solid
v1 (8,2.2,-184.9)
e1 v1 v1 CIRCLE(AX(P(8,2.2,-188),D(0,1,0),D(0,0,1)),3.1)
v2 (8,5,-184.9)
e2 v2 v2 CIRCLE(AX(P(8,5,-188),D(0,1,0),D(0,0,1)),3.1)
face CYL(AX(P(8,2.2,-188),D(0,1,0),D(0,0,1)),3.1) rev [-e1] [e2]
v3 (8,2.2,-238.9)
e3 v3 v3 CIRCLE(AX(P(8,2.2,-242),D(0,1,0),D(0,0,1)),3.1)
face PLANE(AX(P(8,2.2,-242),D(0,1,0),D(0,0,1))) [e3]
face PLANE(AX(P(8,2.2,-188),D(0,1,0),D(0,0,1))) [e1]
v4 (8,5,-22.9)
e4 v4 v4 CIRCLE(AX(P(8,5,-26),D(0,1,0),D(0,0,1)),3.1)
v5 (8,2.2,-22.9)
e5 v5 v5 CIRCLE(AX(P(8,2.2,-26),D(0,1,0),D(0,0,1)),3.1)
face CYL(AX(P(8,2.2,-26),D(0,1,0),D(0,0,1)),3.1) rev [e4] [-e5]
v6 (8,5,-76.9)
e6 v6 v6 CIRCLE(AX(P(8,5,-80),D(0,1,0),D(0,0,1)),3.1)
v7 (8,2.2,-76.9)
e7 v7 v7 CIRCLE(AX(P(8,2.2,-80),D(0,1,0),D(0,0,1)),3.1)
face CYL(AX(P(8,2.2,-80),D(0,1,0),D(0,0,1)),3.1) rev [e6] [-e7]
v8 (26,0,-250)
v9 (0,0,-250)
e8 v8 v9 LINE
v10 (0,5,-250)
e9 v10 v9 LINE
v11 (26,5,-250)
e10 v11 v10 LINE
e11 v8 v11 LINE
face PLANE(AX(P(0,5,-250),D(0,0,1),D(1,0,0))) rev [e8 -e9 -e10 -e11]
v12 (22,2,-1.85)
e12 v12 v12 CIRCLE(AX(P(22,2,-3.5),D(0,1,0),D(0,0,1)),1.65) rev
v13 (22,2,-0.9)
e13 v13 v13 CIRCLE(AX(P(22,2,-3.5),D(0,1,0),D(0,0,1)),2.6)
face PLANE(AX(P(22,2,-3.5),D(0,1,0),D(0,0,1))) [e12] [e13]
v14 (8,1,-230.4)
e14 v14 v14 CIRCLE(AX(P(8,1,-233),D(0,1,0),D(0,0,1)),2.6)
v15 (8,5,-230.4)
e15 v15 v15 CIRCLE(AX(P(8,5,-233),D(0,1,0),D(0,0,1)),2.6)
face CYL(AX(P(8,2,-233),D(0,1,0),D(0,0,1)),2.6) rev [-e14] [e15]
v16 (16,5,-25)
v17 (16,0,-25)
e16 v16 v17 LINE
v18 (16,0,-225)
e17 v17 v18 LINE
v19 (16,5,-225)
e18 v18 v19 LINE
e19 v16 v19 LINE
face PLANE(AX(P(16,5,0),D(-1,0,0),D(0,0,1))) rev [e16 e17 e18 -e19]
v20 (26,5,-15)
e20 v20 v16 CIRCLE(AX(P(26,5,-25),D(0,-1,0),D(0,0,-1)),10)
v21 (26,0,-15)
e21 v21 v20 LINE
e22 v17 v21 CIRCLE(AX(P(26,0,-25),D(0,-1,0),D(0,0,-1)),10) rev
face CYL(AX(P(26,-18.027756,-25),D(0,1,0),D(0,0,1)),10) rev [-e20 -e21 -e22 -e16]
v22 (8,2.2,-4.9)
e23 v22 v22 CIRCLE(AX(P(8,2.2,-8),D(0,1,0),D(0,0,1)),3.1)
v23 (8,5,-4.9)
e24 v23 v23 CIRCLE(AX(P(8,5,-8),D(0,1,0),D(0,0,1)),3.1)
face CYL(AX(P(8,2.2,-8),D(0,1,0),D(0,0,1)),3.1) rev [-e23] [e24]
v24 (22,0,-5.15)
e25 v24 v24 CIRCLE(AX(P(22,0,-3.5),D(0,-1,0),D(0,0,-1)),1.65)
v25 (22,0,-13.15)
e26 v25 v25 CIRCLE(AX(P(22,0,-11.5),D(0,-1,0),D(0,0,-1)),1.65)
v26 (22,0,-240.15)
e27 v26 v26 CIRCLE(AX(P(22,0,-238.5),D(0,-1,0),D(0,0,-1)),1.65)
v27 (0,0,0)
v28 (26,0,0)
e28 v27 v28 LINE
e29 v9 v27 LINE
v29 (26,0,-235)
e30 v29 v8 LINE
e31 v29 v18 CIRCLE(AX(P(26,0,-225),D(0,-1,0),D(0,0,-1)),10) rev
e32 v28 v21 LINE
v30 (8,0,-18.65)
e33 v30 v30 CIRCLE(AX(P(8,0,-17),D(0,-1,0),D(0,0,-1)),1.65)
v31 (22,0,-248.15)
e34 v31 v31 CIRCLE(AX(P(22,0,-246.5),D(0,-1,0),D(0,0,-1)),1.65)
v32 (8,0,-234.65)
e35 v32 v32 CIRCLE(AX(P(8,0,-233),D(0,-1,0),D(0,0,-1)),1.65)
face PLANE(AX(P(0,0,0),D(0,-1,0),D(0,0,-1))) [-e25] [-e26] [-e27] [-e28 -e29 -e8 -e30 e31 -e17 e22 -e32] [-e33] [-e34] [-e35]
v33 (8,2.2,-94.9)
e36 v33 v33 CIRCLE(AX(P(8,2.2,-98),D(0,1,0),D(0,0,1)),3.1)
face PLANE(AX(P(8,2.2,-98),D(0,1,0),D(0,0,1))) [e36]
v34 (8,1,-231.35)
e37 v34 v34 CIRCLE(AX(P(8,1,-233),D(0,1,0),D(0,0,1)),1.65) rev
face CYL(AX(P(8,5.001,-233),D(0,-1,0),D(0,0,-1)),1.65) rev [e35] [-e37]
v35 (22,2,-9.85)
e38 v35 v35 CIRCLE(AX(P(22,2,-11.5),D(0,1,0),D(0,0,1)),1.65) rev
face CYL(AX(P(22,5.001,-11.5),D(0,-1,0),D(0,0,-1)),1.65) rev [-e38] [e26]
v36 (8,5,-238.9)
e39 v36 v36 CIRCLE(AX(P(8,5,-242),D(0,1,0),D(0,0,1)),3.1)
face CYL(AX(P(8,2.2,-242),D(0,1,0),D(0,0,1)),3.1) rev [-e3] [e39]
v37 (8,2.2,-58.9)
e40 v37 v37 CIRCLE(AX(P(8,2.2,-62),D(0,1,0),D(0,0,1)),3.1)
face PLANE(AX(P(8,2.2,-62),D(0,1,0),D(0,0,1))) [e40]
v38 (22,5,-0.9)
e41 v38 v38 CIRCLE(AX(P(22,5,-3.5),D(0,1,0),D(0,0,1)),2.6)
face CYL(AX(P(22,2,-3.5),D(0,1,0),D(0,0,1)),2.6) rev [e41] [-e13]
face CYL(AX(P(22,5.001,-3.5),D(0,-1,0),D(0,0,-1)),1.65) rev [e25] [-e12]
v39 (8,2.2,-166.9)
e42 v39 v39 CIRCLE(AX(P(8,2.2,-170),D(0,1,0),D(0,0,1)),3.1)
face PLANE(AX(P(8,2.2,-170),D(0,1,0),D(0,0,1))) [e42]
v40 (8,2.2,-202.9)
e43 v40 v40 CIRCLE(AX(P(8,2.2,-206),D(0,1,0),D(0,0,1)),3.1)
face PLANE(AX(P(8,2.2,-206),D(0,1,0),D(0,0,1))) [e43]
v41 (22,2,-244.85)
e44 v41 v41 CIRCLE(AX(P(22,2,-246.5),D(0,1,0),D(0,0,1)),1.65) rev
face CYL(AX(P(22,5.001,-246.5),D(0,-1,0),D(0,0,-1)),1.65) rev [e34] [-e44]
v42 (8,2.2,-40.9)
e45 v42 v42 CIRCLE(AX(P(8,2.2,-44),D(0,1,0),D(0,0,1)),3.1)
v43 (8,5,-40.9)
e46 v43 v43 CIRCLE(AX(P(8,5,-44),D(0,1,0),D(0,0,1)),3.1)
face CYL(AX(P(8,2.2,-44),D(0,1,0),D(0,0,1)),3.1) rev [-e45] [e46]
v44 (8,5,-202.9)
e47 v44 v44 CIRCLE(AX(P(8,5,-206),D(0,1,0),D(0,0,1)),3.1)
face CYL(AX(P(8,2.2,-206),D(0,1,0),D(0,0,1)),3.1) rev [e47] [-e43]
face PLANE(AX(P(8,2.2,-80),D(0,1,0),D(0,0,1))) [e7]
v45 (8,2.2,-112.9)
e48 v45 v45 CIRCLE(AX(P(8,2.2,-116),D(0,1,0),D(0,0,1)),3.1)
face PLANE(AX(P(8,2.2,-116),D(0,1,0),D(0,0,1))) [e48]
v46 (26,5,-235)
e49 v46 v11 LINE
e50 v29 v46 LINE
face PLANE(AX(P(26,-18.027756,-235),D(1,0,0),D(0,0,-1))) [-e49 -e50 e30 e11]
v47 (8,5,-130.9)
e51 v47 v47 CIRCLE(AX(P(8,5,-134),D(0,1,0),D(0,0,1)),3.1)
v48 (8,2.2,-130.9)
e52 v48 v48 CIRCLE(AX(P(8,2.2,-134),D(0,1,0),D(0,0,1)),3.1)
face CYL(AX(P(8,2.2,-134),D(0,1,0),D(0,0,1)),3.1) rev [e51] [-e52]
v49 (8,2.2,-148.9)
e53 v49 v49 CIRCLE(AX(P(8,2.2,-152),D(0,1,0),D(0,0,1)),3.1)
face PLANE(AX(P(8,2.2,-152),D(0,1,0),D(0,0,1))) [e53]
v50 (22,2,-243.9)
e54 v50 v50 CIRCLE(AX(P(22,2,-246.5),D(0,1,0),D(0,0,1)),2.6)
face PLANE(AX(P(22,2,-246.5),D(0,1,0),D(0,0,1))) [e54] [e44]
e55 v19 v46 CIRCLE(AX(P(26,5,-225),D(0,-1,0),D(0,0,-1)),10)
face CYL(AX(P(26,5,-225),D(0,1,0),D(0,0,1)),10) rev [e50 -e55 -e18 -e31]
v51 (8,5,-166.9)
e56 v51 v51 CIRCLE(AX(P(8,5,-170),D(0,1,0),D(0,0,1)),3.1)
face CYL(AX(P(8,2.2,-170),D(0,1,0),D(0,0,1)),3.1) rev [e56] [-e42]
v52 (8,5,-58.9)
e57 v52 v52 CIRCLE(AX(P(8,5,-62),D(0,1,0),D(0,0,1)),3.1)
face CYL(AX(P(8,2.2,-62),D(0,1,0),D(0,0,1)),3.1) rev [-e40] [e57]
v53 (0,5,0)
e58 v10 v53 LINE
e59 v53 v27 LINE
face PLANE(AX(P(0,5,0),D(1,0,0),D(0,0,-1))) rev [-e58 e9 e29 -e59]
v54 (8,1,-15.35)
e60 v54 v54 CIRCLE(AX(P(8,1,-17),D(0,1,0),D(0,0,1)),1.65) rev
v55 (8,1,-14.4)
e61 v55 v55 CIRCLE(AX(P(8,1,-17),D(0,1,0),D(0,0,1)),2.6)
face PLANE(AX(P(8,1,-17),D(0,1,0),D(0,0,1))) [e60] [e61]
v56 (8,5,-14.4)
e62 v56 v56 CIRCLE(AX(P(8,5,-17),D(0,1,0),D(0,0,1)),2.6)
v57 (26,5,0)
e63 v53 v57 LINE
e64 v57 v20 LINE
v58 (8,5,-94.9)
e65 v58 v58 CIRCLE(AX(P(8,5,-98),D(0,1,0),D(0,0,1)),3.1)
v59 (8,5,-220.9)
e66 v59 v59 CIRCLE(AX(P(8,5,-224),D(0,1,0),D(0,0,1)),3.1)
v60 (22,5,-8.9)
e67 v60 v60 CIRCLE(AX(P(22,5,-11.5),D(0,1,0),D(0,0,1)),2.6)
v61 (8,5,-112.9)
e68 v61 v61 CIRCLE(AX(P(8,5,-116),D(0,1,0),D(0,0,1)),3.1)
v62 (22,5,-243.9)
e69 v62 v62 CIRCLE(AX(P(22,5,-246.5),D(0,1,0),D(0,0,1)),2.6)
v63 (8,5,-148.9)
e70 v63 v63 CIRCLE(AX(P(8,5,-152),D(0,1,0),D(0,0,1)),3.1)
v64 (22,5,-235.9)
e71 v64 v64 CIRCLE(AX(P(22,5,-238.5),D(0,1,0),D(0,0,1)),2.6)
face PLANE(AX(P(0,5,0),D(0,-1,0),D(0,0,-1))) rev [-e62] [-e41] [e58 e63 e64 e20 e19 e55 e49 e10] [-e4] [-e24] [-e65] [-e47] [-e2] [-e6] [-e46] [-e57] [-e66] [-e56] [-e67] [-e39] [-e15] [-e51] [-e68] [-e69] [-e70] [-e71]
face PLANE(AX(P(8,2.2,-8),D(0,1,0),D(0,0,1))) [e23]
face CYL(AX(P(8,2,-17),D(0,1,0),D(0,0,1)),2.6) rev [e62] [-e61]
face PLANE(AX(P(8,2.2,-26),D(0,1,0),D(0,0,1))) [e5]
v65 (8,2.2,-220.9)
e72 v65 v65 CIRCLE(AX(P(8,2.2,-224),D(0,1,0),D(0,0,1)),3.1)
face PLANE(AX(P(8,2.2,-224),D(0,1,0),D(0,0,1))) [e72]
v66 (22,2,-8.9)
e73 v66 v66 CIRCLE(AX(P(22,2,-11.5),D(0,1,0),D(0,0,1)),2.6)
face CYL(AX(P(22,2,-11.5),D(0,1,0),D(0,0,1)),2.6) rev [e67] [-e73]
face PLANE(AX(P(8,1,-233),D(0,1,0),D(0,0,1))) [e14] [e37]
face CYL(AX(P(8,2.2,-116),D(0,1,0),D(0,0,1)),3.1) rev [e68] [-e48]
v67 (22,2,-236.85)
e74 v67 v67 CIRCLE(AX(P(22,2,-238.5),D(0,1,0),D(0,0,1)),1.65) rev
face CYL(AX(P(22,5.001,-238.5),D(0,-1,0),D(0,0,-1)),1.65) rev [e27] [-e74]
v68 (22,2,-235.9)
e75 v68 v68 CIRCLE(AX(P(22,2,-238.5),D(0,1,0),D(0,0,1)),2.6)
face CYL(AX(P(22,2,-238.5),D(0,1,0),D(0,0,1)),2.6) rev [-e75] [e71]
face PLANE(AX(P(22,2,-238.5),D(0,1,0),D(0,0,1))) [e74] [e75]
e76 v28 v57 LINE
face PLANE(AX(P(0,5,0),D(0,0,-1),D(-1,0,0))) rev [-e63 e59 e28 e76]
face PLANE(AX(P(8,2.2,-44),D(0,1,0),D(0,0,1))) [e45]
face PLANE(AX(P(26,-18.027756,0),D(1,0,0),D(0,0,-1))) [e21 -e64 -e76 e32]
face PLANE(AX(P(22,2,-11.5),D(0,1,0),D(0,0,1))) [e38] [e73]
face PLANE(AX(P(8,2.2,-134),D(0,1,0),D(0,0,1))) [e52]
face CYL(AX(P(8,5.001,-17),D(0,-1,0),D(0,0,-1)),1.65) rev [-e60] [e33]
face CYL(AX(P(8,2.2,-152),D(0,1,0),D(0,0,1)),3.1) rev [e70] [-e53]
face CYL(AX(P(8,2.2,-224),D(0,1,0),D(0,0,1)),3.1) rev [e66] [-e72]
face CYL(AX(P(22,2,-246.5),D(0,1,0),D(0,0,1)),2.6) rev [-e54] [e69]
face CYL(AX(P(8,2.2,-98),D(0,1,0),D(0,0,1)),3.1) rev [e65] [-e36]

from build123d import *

# Parameters (mm, degrees)
SKETCH1_W           = 16
SKETCH1_H           = 250
BOSS_EXTRUDE1_DEPTH = 5
SKETCH2_R           = 3.1
CUT_EXTRUDE1_DEPTH  = 2.8
SKETCH4_W           = 10
SKETCH4_H           = 15
BOSS_EXTRUDE2_DEPTH = 5
CUT_EXTRUDE2_REACH  = 253.398
SKETCH5_R           = 1.65
SKETCH6_R           = 2.6
CUT_EXTRUDE3_DEPTH  = 3
FILLET1_R           = 10
SKETCH8_R           = 2.6
CUT_EXTRUDE4_DEPTH  = 4


with BuildPart() as part:
    # Sketch1 → Boss-Extrude1 (new body)
    with BuildSketch(Plane(origin=(0, 0, 0), x_dir=(1, 0, 0), z_dir=(0, 1, 0))):
        with Locations((8, 125)):
            Rectangle(SKETCH1_W, SKETCH1_H)
    extrude(amount=BOSS_EXTRUDE1_DEPTH)

    # Sketch2 → Cut-Extrude1 (cut)
    with BuildSketch(Plane(origin=(0, 5, 0), x_dir=(1, 0, 0), z_dir=(0, 1, 0))):
        with Locations(Location((8, 242, 0), (0, 0, 270))):
            Circle(SKETCH2_R)
        with Locations(Location((8, 224, 0), (0, 0, 270))):
            Circle(SKETCH2_R)
        with Locations(Location((8, 206, 0), (0, 0, 270))):
            Circle(SKETCH2_R)
        with Locations(Location((8, 188, 0), (0, 0, 270))):
            Circle(SKETCH2_R)
        with Locations(Location((8, 170, 0), (0, 0, 270))):
            Circle(SKETCH2_R)
        with Locations(Location((8, 152, 0), (0, 0, 270))):
            Circle(SKETCH2_R)
        with Locations(Location((8, 134, 0), (0, 0, 270))):
            Circle(SKETCH2_R)
        with Locations(Location((8, 116, 0), (0, 0, 270))):
            Circle(SKETCH2_R)
        with Locations(Location((8, 98, 0), (0, 0, 270))):
            Circle(SKETCH2_R)
        with Locations(Location((8, 80, 0), (0, 0, 270))):
            Circle(SKETCH2_R)
        with Locations(Location((8, 62, 0), (0, 0, 270))):
            Circle(SKETCH2_R)
        with Locations(Location((8, 44, 0), (0, 0, 270))):
            Circle(SKETCH2_R)
        with Locations(Location((8, 26, 0), (0, 0, 270))):
            Circle(SKETCH2_R)
        with Locations(Location((8, 8, 0), (0, 0, 270))):
            Circle(SKETCH2_R)
    extrude(amount=-CUT_EXTRUDE1_DEPTH, mode=Mode.SUBTRACT)

    # Sketch4 → Boss-Extrude2 (add)
    with BuildSketch(Plane(origin=(0, 5, 0), x_dir=(1, 0, 0), z_dir=(0, 1, 0))):
        with Locations((21, 7.5)):
            Rectangle(SKETCH4_W, SKETCH4_H)
        with Locations((21, 242.5)):
            Rectangle(SKETCH4_W, SKETCH4_H)
    extrude(amount=-BOSS_EXTRUDE2_DEPTH)

    # Sketch5 → Cut-Extrude2 (cut, up to next)
    with BuildSketch(Plane.XZ, mode=Mode.PRIVATE) as cut_extrude2_sk1:
        with Locations(Location((22, -3.5, 0), (0, 0, 270))):
            Circle(SKETCH5_R)
    cut_extrude2_tool1 = extrude(cut_extrude2_sk1.sketch, amount=-CUT_EXTRUDE2_REACH, mode=Mode.PRIVATE) & part.part
    # Sketch5 → Cut-Extrude2 (cut, up to next)
    with BuildSketch(Plane.XZ, mode=Mode.PRIVATE) as cut_extrude2_sk2:
        with Locations(Location((22, -11.5, 0), (0, 0, 270))):
            Circle(SKETCH5_R)
    cut_extrude2_tool2 = extrude(cut_extrude2_sk2.sketch, amount=-CUT_EXTRUDE2_REACH, mode=Mode.PRIVATE) & part.part
    # Sketch5 → Cut-Extrude2 (cut, up to next)
    with BuildSketch(Plane.XZ, mode=Mode.PRIVATE) as cut_extrude2_sk3:
        with Locations(Location((22, -238.5, 0), (0, 0, 270))):
            Circle(SKETCH5_R)
    cut_extrude2_tool3 = extrude(cut_extrude2_sk3.sketch, amount=-CUT_EXTRUDE2_REACH, mode=Mode.PRIVATE) & part.part
    # Sketch5 → Cut-Extrude2 (cut, up to next)
    with BuildSketch(Plane.XZ, mode=Mode.PRIVATE) as cut_extrude2_sk4:
        with Locations(Location((22, -246.5, 0), (0, 0, 270))):
            Circle(SKETCH5_R)
    cut_extrude2_tool4 = extrude(cut_extrude2_sk4.sketch, amount=-CUT_EXTRUDE2_REACH, mode=Mode.PRIVATE) & part.part
    # Sketch5 → Cut-Extrude2 (cut, up to next)
    with BuildSketch(Plane.XZ, mode=Mode.PRIVATE) as cut_extrude2_sk5:
        with Locations(Location((8, -17, 0), (0, 0, 270))):
            Circle(SKETCH5_R)
    cut_extrude2_tool5 = extrude(cut_extrude2_sk5.sketch, amount=-CUT_EXTRUDE2_REACH, mode=Mode.PRIVATE) & part.part
    # Sketch5 → Cut-Extrude2 (cut, up to next)
    with BuildSketch(Plane.XZ, mode=Mode.PRIVATE) as cut_extrude2_sk6:
        with Locations(Location((8, -233, 0), (0, 0, 270))):
            Circle(SKETCH5_R)
    cut_extrude2_tool6 = extrude(cut_extrude2_sk6.sketch, amount=-CUT_EXTRUDE2_REACH, mode=Mode.PRIVATE) & part.part
    add(cut_extrude2_tool1.solids().sort_by_distance((22, 0, -3.5))[0], mode=Mode.SUBTRACT)
    add(cut_extrude2_tool2.solids().sort_by_distance((22, 0, -11.5))[0], mode=Mode.SUBTRACT)
    add(cut_extrude2_tool3.solids().sort_by_distance((22, 0, -238.5))[0], mode=Mode.SUBTRACT)
    add(cut_extrude2_tool4.solids().sort_by_distance((22, 0, -246.5))[0], mode=Mode.SUBTRACT)
    add(cut_extrude2_tool5.solids().sort_by_distance((8, 0, -17))[0], mode=Mode.SUBTRACT)
    add(cut_extrude2_tool6.solids().sort_by_distance((8, 0, -233))[0], mode=Mode.SUBTRACT)

    # Sketch6 → Cut-Extrude3 (cut)
    with BuildSketch(Plane(origin=(0, 5, 0), x_dir=(1, 0, 0), z_dir=(0, 1, 0))):
        with Locations(Location((22, 246.5, 0), (0, 0, 270))):
            Circle(SKETCH6_R)
        with Locations(Location((22, 238.5, 0), (0, 0, 270))):
            Circle(SKETCH6_R)
        with Locations(Location((22, 11.5, 0), (0, 0, 270))):
            Circle(SKETCH6_R)
        with Locations(Location((22, 3.5, 0), (0, 0, 270))):
            Circle(SKETCH6_R)
        with Locations(Location((8, 233, 0), (0, 0, 270))):
            Circle(SKETCH6_R)
        with Locations(Location((8, 17, 0), (0, 0, 270))):
            Circle(SKETCH6_R)
    extrude(amount=-CUT_EXTRUDE3_DEPTH, mode=Mode.SUBTRACT)

    # Fillet1
    fillet1_edges = [part.edges().sort_by_distance(p)[0] for p in [
        (16, 2.5, -235),
        (16, 2.5, -15),
    ]]
    fillet(fillet1_edges, radius=FILLET1_R - 0.0001)  # a hair under: the kernel refuses the full size

    # Sketch8 → Cut-Extrude4 (cut)
    with BuildSketch(Plane(origin=(0, 5, 0), x_dir=(1, 0, 0), z_dir=(0, 1, 0))):
        with Locations(Location((8, 233, 0), (0, 0, 270))):
            Circle(SKETCH8_R)
        with Locations(Location((8, 17, 0), (0, 0, 270))):
            Circle(SKETCH8_R)
    extrude(amount=-CUT_EXTRUDE4_DEPTH, mode=Mode.SUBTRACT)


solid = part.part
